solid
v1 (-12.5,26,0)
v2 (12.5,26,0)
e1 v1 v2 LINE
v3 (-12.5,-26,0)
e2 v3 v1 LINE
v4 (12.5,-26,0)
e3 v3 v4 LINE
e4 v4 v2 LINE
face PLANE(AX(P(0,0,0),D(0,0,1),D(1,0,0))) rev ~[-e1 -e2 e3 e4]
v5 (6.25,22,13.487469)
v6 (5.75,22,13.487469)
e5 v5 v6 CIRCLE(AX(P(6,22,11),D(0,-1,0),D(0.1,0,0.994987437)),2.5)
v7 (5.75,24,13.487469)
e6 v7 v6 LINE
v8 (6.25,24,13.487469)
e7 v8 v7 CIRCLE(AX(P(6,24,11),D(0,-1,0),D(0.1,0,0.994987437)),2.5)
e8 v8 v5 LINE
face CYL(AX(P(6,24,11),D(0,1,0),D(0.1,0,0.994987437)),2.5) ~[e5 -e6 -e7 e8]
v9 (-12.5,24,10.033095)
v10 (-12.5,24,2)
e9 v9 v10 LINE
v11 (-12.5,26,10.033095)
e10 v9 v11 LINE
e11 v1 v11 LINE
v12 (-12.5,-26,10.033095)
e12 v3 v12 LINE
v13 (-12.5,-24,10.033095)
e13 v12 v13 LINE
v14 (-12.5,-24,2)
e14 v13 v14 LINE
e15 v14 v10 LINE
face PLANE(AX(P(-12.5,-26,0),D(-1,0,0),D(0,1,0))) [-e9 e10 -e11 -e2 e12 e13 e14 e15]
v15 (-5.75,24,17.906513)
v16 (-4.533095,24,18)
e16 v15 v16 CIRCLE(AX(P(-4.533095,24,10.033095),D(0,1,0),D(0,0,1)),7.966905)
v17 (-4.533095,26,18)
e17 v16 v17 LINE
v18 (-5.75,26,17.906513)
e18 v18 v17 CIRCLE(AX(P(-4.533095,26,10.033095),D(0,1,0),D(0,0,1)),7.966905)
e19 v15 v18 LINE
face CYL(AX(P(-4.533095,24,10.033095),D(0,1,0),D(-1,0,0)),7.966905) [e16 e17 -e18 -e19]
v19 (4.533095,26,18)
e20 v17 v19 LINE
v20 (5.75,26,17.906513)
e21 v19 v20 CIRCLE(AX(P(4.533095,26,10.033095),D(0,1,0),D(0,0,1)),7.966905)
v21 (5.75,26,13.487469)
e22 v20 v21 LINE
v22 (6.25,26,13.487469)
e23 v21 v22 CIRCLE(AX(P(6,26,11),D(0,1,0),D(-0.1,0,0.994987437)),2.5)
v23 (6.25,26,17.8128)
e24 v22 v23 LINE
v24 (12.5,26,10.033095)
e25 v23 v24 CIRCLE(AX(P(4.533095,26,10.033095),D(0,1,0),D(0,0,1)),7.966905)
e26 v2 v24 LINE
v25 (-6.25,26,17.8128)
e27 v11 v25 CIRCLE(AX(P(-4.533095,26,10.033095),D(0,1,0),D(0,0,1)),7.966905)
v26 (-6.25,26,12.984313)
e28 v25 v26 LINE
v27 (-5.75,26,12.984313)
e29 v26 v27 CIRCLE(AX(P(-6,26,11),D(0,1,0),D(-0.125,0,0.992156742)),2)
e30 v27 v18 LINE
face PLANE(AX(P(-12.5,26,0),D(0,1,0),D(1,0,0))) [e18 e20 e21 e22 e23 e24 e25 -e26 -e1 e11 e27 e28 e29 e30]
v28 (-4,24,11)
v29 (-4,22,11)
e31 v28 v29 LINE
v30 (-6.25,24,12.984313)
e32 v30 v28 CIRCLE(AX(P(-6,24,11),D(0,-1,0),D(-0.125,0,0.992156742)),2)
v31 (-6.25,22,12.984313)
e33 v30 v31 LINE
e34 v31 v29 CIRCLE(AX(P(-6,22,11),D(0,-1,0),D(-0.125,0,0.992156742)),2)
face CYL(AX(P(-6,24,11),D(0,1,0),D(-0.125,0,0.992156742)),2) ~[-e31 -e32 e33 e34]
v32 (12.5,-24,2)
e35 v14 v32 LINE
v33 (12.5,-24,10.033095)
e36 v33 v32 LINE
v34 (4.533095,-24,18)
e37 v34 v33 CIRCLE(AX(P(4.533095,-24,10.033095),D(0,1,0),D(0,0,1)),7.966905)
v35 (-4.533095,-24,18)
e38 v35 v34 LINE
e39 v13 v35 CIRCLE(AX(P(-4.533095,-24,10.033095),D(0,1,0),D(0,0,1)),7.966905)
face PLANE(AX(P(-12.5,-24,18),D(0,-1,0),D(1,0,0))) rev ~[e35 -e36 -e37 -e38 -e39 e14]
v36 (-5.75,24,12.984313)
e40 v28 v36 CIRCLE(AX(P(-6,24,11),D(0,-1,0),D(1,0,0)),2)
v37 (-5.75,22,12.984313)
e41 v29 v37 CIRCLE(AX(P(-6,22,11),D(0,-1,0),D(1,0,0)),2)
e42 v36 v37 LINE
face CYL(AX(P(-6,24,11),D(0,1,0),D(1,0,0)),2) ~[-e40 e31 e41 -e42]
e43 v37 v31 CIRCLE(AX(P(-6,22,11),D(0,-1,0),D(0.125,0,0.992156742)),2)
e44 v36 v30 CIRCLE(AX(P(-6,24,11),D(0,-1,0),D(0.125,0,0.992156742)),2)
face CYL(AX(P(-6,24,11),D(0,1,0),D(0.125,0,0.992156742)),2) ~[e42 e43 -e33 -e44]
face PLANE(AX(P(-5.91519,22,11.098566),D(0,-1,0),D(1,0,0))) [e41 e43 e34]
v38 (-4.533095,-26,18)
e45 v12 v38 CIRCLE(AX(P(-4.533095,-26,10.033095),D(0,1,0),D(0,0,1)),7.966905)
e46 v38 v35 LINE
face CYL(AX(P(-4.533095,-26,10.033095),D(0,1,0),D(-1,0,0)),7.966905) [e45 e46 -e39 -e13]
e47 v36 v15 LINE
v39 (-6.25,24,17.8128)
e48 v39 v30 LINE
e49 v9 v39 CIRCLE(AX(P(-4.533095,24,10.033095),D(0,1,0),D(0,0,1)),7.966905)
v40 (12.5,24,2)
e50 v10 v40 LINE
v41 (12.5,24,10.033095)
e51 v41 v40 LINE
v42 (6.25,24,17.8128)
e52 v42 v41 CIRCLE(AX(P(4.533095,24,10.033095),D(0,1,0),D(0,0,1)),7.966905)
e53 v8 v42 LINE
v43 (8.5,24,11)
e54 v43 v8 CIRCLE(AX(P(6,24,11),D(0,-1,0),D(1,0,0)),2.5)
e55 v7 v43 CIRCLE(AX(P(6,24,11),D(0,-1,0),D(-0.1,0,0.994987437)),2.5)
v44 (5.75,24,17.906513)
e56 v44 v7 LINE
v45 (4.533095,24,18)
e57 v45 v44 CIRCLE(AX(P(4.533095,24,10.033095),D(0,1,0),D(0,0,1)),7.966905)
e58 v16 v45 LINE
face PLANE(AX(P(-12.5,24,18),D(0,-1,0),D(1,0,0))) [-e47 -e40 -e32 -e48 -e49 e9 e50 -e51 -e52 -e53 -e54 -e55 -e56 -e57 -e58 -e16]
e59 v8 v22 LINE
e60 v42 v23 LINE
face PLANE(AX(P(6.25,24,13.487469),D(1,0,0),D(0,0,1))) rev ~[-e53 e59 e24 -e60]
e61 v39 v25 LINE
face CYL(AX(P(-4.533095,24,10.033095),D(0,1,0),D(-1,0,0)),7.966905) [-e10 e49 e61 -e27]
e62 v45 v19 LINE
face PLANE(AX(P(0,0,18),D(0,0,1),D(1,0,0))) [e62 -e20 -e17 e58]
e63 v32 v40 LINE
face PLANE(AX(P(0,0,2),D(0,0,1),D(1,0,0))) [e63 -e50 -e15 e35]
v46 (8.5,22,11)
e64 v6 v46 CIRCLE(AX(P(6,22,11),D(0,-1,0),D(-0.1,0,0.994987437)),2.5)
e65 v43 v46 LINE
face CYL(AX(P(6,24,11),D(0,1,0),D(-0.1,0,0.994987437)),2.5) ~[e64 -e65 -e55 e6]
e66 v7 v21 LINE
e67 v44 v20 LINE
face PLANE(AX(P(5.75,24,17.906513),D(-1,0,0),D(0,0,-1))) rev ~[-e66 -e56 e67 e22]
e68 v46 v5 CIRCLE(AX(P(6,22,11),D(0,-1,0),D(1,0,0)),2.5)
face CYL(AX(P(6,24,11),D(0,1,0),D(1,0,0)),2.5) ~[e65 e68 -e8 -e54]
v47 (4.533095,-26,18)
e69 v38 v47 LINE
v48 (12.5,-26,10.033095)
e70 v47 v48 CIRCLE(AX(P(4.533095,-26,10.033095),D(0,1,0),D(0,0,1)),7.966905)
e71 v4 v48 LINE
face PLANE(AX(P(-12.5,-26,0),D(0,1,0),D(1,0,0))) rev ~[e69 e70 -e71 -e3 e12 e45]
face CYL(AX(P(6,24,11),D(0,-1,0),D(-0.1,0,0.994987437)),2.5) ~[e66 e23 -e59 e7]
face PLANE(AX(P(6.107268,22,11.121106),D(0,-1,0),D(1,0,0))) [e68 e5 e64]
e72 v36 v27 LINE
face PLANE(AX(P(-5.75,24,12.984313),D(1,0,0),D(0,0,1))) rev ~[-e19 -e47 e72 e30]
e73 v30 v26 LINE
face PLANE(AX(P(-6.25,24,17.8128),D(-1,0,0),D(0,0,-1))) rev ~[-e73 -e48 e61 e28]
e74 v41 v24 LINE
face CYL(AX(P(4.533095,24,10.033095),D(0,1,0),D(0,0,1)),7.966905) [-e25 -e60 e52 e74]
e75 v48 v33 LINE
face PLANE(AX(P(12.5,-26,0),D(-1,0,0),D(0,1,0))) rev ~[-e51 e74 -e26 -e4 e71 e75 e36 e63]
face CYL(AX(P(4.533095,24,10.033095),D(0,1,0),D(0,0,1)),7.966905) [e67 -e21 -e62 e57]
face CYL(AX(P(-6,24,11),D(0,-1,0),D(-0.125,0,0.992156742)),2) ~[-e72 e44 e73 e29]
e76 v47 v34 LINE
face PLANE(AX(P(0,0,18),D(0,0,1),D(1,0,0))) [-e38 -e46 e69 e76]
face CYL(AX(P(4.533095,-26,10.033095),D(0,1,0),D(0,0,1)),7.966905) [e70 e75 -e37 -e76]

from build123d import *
from build123d import SkipClean  # not in build123d's __all__

# Parameters (mm, degrees)
F0_W     = 25
F0_H     = 52
F1_DEPTH = 18
F2_W     = 25
F2_H     = 48
F3_DEPTH = 16
F4_R     = 7.9669047558
F6_DEPTH = 2
F7_DEPTH = 2


with BuildPart() as f1:
    # F0 (on Top) → F1 (new body)
    with BuildSketch(Plane.XY):
        Rectangle(F0_W, F0_H)
    extrude(amount=F1_DEPTH)

    # F2 (on face) → F3 (cut)
    with BuildSketch(Plane.XY.offset(18)):
        Rectangle(F2_W, F2_H)
    extrude(amount=-F3_DEPTH, mode=Mode.SUBTRACT)

    # F4
    f4_edges = [f1.edges().sort_by_distance(p)[0] for p in [
        (-12.5, 25, 18),
        (12.5, 25, 18),
        (-12.5, -25, 18),
        (12.5, -25, 18),
    ]]
    fillet(f4_edges, radius=F4_R)

    # F5 (on face) → F6 (join)
    with BuildSketch(Plane.XZ.offset(-24)):
        with BuildLine():
            ThreePointArc((-4, 11), (-4.5, 12.3228756555), (-5.75, 12.9843134833))
            ThreePointArc((-5.75, 12.9843134833), (-6, 13), (-6.25, 12.9843134833))
            ThreePointArc((-6.25, 12.9843134833), (-7.3228756555, 9.5), (-4, 11))
        make_face()
        with BuildLine():
            ThreePointArc((5.75, 13.4874685928), (4.3229490169, 9.1459503782), (8.5, 11))
            ThreePointArc((8.5, 11), (7.8540496218, 12.6770509831), (6.25, 13.4874685928))
            ThreePointArc((6.25, 13.4874685928), (6, 13.5), (5.75, 13.4874685928))
        make_face()
    extrude(amount=F6_DEPTH)

    # F5 (on face) → F7 (cut, through all)
    with BuildSketch(Plane.XZ.offset(-24)):
        with BuildLine():
            Line((-5.75, 12.9843134833), (-5.75, 17.9065134474))
            ThreePointArc((-5.75, 17.9065134474), (-6.0007481681, 17.8636486271), (-6.25, 17.8128002159))
            Line((-6.25, 17.8128002159), (-6.25, 12.9843134833))
            ThreePointArc((-6.25, 12.9843134833), (-6, 13), (-5.75, 12.9843134833))
        make_face()
        with BuildLine():
            ThreePointArc((5.75, 13.4874685928), (6, 13.5), (6.25, 13.4874685928))
            Line((6.25, 13.4874685928), (6.25, 17.8128002159))
            ThreePointArc((6.25, 17.8128002159), (6.0007481681, 17.8636486271), (5.75, 17.9065134474))
            Line((5.75, 17.9065134474), (5.75, 13.4874685928))
        make_face()
    with SkipClean():  # cleaning this boolean's faces spoils the solid; the shape is the same uncleaned
        extrude(amount=-F7_DEPTH, mode=Mode.SUBTRACT)


solid = f1.part
